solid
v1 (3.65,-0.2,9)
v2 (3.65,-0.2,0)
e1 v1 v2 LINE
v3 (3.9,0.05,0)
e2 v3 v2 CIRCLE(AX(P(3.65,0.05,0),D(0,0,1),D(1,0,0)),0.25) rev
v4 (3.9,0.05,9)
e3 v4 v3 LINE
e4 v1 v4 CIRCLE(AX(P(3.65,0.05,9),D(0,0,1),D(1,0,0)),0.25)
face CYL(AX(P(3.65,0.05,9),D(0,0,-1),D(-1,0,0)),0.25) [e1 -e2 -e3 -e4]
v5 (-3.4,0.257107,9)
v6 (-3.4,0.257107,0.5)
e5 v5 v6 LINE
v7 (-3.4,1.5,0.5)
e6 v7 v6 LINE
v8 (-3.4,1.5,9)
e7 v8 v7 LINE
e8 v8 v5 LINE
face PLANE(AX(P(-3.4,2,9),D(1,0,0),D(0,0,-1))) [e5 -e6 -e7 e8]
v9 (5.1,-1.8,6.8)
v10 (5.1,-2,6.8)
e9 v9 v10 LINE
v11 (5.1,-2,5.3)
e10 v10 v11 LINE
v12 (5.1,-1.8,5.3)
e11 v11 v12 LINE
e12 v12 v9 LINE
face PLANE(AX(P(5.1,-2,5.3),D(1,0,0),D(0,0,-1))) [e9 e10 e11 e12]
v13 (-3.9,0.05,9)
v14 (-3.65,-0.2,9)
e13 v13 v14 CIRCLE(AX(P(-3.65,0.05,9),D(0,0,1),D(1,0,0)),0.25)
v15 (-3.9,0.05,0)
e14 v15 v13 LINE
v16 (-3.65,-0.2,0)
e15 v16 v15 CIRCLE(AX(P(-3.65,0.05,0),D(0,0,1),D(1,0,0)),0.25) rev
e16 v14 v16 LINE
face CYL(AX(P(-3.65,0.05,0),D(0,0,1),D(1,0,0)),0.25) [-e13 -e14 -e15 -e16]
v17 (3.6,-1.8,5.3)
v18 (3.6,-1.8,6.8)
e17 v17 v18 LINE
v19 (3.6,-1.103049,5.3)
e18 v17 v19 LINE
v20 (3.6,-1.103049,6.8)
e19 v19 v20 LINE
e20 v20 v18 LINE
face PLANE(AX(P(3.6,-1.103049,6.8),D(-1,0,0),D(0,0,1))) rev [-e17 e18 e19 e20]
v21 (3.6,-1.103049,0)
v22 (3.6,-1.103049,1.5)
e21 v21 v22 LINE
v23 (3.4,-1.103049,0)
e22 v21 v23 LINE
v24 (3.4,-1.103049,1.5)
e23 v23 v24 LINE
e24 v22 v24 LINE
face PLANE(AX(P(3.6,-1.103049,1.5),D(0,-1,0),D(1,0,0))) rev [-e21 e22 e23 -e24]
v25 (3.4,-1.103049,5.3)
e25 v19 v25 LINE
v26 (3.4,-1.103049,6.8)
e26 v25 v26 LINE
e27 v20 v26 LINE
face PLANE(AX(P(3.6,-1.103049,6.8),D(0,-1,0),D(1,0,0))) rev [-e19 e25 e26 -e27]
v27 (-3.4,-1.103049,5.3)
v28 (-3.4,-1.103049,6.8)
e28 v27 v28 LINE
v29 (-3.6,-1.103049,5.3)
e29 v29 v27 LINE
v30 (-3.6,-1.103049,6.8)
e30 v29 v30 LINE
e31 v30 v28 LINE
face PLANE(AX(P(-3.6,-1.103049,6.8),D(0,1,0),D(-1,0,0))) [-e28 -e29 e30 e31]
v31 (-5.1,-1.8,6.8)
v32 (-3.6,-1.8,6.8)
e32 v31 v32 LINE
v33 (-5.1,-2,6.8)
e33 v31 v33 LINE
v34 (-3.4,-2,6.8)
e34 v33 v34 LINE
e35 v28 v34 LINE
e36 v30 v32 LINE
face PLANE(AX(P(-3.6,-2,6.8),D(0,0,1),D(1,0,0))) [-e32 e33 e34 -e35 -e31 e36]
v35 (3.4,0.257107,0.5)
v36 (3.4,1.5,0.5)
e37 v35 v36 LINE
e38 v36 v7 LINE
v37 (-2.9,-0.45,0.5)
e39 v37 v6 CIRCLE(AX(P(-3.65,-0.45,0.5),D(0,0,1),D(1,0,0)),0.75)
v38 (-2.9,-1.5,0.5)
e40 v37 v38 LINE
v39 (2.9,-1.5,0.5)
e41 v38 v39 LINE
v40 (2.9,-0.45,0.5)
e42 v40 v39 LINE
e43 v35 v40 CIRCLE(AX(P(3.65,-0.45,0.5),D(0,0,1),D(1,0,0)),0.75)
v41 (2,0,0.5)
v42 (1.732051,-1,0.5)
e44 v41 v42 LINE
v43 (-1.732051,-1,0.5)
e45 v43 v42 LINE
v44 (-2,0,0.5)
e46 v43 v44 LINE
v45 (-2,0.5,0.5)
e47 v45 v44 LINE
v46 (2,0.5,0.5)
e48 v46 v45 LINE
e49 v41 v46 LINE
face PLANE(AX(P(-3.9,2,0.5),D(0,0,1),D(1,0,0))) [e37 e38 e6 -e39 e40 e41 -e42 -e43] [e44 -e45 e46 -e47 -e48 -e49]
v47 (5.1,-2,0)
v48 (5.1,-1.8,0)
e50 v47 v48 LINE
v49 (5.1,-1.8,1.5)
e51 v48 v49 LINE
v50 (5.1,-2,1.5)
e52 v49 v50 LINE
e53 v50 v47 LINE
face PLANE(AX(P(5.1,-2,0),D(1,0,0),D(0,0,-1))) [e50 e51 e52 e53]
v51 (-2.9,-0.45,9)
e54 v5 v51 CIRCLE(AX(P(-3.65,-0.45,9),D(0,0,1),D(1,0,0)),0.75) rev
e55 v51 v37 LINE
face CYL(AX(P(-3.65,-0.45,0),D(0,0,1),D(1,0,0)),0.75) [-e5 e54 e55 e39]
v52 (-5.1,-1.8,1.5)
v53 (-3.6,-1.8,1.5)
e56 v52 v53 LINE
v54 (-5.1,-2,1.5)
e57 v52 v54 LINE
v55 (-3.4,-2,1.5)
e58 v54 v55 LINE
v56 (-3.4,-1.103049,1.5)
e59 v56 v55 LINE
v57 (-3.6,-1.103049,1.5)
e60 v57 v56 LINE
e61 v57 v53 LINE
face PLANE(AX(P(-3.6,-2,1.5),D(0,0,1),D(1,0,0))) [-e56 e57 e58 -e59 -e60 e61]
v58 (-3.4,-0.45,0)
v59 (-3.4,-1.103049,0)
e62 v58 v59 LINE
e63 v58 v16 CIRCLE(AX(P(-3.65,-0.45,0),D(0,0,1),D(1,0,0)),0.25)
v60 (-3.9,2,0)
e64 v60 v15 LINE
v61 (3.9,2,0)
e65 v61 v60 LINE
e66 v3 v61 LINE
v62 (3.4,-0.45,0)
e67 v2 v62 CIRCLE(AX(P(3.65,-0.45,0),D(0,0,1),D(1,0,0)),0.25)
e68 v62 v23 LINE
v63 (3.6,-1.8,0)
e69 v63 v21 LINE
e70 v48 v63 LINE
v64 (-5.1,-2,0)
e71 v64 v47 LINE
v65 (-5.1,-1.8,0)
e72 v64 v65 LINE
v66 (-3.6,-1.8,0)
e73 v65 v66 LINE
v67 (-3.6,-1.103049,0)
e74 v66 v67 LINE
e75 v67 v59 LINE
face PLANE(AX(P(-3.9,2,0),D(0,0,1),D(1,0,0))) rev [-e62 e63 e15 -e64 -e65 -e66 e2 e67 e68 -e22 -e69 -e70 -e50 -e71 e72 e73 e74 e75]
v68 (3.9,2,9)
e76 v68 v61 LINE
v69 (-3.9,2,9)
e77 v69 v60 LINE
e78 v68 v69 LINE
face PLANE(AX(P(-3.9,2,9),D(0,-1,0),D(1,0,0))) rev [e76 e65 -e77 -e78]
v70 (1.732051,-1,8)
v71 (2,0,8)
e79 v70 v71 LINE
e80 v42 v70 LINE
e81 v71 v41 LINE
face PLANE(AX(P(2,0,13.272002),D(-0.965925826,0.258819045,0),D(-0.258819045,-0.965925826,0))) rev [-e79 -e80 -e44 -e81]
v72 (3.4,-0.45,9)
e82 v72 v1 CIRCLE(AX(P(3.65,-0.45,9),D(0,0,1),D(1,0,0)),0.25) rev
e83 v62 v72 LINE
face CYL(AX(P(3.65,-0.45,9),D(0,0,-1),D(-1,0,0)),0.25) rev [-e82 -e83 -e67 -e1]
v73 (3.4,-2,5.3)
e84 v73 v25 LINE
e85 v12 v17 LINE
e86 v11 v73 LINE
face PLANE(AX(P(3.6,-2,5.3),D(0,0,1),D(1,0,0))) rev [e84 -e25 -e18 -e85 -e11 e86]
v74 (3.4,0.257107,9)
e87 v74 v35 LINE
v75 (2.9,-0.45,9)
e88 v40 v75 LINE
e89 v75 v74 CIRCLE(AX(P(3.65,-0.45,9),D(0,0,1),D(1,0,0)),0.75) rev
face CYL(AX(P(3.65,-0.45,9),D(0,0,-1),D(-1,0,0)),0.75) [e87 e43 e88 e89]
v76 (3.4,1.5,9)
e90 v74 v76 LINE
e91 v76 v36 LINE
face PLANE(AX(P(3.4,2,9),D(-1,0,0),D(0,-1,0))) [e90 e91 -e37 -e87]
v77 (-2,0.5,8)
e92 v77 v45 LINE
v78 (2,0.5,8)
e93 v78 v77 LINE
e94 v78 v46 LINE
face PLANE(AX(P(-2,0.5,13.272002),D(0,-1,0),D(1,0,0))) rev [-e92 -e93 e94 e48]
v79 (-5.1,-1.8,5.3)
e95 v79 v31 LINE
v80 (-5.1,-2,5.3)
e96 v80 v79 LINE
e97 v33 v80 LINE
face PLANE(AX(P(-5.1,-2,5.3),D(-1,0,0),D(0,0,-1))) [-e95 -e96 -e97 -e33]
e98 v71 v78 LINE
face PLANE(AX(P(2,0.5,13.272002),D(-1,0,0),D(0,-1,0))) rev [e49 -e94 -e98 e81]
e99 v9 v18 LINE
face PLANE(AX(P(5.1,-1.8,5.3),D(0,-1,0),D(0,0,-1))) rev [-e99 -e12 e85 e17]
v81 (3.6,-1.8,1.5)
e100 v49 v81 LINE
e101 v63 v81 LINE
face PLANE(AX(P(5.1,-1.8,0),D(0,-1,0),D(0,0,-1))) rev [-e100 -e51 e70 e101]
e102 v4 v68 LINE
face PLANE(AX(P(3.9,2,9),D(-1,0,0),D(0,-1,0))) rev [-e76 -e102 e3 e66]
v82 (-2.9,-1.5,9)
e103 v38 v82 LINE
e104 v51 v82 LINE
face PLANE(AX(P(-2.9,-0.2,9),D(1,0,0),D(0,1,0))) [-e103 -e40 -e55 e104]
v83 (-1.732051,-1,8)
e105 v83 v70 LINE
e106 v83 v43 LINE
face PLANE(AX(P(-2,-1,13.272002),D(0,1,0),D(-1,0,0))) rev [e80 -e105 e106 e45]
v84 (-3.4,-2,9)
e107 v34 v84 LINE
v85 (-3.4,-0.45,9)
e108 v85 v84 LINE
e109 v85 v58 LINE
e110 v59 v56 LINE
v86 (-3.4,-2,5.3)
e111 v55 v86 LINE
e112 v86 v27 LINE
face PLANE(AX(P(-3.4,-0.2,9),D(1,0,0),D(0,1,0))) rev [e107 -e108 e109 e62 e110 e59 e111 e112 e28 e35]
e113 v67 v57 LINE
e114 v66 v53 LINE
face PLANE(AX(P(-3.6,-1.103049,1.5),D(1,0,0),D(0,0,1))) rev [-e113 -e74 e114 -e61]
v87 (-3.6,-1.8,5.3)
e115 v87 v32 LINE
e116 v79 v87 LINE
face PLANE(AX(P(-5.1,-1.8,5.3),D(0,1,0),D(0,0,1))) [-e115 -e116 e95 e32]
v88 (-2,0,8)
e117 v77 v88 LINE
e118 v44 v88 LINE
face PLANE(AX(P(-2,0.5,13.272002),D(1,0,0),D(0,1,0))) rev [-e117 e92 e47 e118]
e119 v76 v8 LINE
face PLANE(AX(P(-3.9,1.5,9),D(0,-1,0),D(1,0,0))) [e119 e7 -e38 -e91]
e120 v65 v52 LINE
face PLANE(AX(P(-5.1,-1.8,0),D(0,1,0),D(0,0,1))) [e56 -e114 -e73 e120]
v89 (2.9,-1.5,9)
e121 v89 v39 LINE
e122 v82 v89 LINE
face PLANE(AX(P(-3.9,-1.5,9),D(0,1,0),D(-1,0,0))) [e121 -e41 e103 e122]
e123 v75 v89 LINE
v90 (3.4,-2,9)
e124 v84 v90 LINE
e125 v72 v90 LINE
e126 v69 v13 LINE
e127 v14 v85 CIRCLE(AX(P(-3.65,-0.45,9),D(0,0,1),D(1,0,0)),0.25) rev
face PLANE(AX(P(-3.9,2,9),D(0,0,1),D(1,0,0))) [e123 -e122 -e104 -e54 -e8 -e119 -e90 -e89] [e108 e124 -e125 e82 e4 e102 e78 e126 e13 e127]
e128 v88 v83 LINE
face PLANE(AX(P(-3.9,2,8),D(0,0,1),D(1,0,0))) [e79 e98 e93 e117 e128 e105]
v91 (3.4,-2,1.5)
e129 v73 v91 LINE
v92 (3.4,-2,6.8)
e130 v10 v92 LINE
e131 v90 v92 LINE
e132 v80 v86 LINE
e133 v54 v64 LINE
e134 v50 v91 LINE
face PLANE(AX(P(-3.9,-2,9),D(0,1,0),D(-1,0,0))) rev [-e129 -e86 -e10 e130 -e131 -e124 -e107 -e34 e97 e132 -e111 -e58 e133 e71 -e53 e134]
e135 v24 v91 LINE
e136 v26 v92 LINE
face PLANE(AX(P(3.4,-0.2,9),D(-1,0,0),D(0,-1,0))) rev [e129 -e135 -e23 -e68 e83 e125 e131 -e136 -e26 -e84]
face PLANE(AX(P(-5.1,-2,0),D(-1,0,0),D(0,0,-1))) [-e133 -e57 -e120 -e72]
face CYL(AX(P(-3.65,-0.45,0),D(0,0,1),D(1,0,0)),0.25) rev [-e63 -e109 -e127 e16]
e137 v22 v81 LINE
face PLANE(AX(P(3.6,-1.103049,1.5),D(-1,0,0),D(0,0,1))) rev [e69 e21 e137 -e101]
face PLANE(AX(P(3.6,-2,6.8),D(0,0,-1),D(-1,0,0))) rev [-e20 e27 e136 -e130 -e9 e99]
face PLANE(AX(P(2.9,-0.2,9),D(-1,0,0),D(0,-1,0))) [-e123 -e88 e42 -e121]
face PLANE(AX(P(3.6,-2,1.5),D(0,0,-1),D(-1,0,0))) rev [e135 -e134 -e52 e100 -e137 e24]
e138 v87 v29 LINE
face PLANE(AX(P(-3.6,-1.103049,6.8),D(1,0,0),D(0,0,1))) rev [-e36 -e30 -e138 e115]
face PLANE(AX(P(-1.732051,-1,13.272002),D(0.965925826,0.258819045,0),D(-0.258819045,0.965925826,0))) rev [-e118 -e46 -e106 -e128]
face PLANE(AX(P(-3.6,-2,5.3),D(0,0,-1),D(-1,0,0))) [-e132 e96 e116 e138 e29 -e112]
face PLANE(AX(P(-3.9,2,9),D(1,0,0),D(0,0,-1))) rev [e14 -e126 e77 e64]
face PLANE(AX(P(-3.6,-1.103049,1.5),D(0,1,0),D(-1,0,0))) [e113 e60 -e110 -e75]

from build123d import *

# Parameters (mm, degrees)
SKETCH_1_W          = 7.8
SKETCH_1_H          = 4
EXTRUDE_1_DEPTH     = 9
SKETCH_2_W          = 0.5
SKETCH_2_H          = 9
CUT_EXTRUDE_1_DEPTH = 1.8
FILLET_START        = -1
FILLET_1_DEPTH      = 11
FILLET_1_2_DEPTH    = 9
SHELL_1_T           = -0.5
SKETCH_3_W          = 4
SKETCH_3_H          = 1.5
EXTRUDE_2_DEPTH     = 7.5
CHAMFER_1_SIZE      = 1
CHAMFER_1_SIZE2     = 0.267949192
CHAMFER_2_SIZE      = 1
CHAMFER_2_SIZE2     = 0.267949192
SKETCH_4_W          = 1.5
SKETCH_4_H          = 0.896951392
EXTRUDE_3_DEPTH     = 0.2
SKETCH_5_W          = 1.5
SKETCH_5_H          = 0.2
EXTRUDE_4_DEPTH     = 1.5


with BuildPart() as part:
    # 草图1 → 拉伸1 (new body)
    with BuildSketch(Plane.XY):
        Rectangle(SKETCH_1_W, SKETCH_1_H)
    extrude(amount=EXTRUDE_1_DEPTH)

    # 草图2 → 切除-拉伸1 (cut)
    with BuildSketch(Plane.XZ.offset(2)):
        with Locations((-3.65, 4.5)):
            Rectangle(SKETCH_2_W, SKETCH_2_H)
        with Locations((3.65, 4.5)):
            Rectangle(SKETCH_2_W, SKETCH_2_H)
    extrude(amount=-CUT_EXTRUDE_1_DEPTH, mode=Mode.SUBTRACT)

    # 圆角1: read off the stored shape, not the designer's step
    # 圆角1 outline → 圆角1 (cut)
    with BuildSketch(Plane.XY.offset(FILLET_START)):
        with BuildLine():
            ThreePointArc((3.9, 0.05), (3.826776695, -0.126776695), (3.65, -0.2))
            Line((3.65, -0.2), (3.9, -0.2))
            Line((3.9, -0.2), (3.9, 0.05))
        make_face()
        with BuildLine():
            ThreePointArc((-3.65, -0.2), (-3.826776695, -0.126776695), (-3.9, 0.05))
            Line((-3.9, 0.05), (-3.9, -0.2))
            Line((-3.9, -0.2), (-3.65, -0.2))
        make_face()
    extrude(amount=FILLET_1_DEPTH, mode=Mode.SUBTRACT)

    # Fillet 1 2 outline → Fillet 1 2 (add)
    with BuildSketch(Plane.XY):
        with BuildLine():
            Line((3.4, -0.2), (3.4, -0.45))
            ThreePointArc((3.4, -0.45), (3.473223305, -0.273223305), (3.65, -0.2))
            Line((3.65, -0.2), (3.4, -0.2))
        make_face()
        with BuildLine():
            Line((-3.4, -0.2), (-3.65, -0.2))
            ThreePointArc((-3.65, -0.2), (-3.473223305, -0.273223305), (-3.4, -0.45))
            Line((-3.4, -0.45), (-3.4, -0.2))
        make_face()
    extrude(amount=FILLET_1_2_DEPTH)

    # 抽壳1
    shell_1_openings = [part.faces().sort_by_distance(p)[0] for p in [
        (0, 0.067245036, 9),
    ]]
    offset(amount=SHELL_1_T, openings=shell_1_openings, kind=Kind.INTERSECTION)

    # 草图3 → 拉伸2 (add)
    with BuildSketch(Plane.XY.offset(0.5)):
        with Locations((0, -0.25)):
            Rectangle(SKETCH_3_W, SKETCH_3_H)
    extrude(amount=EXTRUDE_2_DEPTH)

    # 倒角1
    chamfer_1_edges = [part.edges().sort_by_distance(p)[0] for p in [
        (-2, -1, 4.25),
    ]]
    chamfer_1_side = [part.faces().sort_by_distance(p)[0] for p in [
        (-2, -0.25, 4.25),
    ]]
    chamfer(chamfer_1_edges, length=CHAMFER_1_SIZE, length2=CHAMFER_1_SIZE2, reference=chamfer_1_side[0])

    # 倒角2
    chamfer_2_edges = [part.edges().sort_by_distance(p)[0] for p in [
        (2, -1, 4.25),
    ]]
    chamfer_2_side = [part.faces().sort_by_distance(p)[0] for p in [
        (2, -0.25, 4.25),
    ]]
    chamfer(chamfer_2_edges, length=CHAMFER_2_SIZE, length2=CHAMFER_2_SIZE2, reference=chamfer_2_side[0])

    # 草图4 → 拉伸3 (add)
    with BuildSketch(Plane(origin=(3.4, 0, 0), x_dir=(0, 0, -1), z_dir=(1, 0, 0))):
        with Locations((-6.05, -1.551524304)):
            Rectangle(SKETCH_4_W, SKETCH_4_H)
        with Locations((-0.75, -1.551524304)):
            Rectangle(SKETCH_4_W, SKETCH_4_H)
    extrude_3 = extrude(amount=EXTRUDE_3_DEPTH)

    # 镜向1: 拉伸3 across plane
    add(extrude_3.mirror(Plane(origin=(0, 0, 0), x_dir=(0, 0, 1), z_dir=(1, 0, 0))))

    # 草图5 → 拉伸4 (add)
    with BuildSketch(Plane(origin=(3.6, 0, 0), x_dir=(0, 0, -1), z_dir=(1, 0, 0))):
        with Locations((-6.05, -1.9)):
            Rectangle(SKETCH_5_W, SKETCH_5_H)
        with Locations((-0.75, -1.9)):
            Rectangle(SKETCH_5_W, SKETCH_5_H)
    extrude_4 = extrude(amount=EXTRUDE_4_DEPTH)

    # 镜向2: 拉伸4 across plane
    add(extrude_4.mirror(Plane(origin=(0, 0, 0), x_dir=(0, 0, 1), z_dir=(1, 0, 0))))


solid = part.part
